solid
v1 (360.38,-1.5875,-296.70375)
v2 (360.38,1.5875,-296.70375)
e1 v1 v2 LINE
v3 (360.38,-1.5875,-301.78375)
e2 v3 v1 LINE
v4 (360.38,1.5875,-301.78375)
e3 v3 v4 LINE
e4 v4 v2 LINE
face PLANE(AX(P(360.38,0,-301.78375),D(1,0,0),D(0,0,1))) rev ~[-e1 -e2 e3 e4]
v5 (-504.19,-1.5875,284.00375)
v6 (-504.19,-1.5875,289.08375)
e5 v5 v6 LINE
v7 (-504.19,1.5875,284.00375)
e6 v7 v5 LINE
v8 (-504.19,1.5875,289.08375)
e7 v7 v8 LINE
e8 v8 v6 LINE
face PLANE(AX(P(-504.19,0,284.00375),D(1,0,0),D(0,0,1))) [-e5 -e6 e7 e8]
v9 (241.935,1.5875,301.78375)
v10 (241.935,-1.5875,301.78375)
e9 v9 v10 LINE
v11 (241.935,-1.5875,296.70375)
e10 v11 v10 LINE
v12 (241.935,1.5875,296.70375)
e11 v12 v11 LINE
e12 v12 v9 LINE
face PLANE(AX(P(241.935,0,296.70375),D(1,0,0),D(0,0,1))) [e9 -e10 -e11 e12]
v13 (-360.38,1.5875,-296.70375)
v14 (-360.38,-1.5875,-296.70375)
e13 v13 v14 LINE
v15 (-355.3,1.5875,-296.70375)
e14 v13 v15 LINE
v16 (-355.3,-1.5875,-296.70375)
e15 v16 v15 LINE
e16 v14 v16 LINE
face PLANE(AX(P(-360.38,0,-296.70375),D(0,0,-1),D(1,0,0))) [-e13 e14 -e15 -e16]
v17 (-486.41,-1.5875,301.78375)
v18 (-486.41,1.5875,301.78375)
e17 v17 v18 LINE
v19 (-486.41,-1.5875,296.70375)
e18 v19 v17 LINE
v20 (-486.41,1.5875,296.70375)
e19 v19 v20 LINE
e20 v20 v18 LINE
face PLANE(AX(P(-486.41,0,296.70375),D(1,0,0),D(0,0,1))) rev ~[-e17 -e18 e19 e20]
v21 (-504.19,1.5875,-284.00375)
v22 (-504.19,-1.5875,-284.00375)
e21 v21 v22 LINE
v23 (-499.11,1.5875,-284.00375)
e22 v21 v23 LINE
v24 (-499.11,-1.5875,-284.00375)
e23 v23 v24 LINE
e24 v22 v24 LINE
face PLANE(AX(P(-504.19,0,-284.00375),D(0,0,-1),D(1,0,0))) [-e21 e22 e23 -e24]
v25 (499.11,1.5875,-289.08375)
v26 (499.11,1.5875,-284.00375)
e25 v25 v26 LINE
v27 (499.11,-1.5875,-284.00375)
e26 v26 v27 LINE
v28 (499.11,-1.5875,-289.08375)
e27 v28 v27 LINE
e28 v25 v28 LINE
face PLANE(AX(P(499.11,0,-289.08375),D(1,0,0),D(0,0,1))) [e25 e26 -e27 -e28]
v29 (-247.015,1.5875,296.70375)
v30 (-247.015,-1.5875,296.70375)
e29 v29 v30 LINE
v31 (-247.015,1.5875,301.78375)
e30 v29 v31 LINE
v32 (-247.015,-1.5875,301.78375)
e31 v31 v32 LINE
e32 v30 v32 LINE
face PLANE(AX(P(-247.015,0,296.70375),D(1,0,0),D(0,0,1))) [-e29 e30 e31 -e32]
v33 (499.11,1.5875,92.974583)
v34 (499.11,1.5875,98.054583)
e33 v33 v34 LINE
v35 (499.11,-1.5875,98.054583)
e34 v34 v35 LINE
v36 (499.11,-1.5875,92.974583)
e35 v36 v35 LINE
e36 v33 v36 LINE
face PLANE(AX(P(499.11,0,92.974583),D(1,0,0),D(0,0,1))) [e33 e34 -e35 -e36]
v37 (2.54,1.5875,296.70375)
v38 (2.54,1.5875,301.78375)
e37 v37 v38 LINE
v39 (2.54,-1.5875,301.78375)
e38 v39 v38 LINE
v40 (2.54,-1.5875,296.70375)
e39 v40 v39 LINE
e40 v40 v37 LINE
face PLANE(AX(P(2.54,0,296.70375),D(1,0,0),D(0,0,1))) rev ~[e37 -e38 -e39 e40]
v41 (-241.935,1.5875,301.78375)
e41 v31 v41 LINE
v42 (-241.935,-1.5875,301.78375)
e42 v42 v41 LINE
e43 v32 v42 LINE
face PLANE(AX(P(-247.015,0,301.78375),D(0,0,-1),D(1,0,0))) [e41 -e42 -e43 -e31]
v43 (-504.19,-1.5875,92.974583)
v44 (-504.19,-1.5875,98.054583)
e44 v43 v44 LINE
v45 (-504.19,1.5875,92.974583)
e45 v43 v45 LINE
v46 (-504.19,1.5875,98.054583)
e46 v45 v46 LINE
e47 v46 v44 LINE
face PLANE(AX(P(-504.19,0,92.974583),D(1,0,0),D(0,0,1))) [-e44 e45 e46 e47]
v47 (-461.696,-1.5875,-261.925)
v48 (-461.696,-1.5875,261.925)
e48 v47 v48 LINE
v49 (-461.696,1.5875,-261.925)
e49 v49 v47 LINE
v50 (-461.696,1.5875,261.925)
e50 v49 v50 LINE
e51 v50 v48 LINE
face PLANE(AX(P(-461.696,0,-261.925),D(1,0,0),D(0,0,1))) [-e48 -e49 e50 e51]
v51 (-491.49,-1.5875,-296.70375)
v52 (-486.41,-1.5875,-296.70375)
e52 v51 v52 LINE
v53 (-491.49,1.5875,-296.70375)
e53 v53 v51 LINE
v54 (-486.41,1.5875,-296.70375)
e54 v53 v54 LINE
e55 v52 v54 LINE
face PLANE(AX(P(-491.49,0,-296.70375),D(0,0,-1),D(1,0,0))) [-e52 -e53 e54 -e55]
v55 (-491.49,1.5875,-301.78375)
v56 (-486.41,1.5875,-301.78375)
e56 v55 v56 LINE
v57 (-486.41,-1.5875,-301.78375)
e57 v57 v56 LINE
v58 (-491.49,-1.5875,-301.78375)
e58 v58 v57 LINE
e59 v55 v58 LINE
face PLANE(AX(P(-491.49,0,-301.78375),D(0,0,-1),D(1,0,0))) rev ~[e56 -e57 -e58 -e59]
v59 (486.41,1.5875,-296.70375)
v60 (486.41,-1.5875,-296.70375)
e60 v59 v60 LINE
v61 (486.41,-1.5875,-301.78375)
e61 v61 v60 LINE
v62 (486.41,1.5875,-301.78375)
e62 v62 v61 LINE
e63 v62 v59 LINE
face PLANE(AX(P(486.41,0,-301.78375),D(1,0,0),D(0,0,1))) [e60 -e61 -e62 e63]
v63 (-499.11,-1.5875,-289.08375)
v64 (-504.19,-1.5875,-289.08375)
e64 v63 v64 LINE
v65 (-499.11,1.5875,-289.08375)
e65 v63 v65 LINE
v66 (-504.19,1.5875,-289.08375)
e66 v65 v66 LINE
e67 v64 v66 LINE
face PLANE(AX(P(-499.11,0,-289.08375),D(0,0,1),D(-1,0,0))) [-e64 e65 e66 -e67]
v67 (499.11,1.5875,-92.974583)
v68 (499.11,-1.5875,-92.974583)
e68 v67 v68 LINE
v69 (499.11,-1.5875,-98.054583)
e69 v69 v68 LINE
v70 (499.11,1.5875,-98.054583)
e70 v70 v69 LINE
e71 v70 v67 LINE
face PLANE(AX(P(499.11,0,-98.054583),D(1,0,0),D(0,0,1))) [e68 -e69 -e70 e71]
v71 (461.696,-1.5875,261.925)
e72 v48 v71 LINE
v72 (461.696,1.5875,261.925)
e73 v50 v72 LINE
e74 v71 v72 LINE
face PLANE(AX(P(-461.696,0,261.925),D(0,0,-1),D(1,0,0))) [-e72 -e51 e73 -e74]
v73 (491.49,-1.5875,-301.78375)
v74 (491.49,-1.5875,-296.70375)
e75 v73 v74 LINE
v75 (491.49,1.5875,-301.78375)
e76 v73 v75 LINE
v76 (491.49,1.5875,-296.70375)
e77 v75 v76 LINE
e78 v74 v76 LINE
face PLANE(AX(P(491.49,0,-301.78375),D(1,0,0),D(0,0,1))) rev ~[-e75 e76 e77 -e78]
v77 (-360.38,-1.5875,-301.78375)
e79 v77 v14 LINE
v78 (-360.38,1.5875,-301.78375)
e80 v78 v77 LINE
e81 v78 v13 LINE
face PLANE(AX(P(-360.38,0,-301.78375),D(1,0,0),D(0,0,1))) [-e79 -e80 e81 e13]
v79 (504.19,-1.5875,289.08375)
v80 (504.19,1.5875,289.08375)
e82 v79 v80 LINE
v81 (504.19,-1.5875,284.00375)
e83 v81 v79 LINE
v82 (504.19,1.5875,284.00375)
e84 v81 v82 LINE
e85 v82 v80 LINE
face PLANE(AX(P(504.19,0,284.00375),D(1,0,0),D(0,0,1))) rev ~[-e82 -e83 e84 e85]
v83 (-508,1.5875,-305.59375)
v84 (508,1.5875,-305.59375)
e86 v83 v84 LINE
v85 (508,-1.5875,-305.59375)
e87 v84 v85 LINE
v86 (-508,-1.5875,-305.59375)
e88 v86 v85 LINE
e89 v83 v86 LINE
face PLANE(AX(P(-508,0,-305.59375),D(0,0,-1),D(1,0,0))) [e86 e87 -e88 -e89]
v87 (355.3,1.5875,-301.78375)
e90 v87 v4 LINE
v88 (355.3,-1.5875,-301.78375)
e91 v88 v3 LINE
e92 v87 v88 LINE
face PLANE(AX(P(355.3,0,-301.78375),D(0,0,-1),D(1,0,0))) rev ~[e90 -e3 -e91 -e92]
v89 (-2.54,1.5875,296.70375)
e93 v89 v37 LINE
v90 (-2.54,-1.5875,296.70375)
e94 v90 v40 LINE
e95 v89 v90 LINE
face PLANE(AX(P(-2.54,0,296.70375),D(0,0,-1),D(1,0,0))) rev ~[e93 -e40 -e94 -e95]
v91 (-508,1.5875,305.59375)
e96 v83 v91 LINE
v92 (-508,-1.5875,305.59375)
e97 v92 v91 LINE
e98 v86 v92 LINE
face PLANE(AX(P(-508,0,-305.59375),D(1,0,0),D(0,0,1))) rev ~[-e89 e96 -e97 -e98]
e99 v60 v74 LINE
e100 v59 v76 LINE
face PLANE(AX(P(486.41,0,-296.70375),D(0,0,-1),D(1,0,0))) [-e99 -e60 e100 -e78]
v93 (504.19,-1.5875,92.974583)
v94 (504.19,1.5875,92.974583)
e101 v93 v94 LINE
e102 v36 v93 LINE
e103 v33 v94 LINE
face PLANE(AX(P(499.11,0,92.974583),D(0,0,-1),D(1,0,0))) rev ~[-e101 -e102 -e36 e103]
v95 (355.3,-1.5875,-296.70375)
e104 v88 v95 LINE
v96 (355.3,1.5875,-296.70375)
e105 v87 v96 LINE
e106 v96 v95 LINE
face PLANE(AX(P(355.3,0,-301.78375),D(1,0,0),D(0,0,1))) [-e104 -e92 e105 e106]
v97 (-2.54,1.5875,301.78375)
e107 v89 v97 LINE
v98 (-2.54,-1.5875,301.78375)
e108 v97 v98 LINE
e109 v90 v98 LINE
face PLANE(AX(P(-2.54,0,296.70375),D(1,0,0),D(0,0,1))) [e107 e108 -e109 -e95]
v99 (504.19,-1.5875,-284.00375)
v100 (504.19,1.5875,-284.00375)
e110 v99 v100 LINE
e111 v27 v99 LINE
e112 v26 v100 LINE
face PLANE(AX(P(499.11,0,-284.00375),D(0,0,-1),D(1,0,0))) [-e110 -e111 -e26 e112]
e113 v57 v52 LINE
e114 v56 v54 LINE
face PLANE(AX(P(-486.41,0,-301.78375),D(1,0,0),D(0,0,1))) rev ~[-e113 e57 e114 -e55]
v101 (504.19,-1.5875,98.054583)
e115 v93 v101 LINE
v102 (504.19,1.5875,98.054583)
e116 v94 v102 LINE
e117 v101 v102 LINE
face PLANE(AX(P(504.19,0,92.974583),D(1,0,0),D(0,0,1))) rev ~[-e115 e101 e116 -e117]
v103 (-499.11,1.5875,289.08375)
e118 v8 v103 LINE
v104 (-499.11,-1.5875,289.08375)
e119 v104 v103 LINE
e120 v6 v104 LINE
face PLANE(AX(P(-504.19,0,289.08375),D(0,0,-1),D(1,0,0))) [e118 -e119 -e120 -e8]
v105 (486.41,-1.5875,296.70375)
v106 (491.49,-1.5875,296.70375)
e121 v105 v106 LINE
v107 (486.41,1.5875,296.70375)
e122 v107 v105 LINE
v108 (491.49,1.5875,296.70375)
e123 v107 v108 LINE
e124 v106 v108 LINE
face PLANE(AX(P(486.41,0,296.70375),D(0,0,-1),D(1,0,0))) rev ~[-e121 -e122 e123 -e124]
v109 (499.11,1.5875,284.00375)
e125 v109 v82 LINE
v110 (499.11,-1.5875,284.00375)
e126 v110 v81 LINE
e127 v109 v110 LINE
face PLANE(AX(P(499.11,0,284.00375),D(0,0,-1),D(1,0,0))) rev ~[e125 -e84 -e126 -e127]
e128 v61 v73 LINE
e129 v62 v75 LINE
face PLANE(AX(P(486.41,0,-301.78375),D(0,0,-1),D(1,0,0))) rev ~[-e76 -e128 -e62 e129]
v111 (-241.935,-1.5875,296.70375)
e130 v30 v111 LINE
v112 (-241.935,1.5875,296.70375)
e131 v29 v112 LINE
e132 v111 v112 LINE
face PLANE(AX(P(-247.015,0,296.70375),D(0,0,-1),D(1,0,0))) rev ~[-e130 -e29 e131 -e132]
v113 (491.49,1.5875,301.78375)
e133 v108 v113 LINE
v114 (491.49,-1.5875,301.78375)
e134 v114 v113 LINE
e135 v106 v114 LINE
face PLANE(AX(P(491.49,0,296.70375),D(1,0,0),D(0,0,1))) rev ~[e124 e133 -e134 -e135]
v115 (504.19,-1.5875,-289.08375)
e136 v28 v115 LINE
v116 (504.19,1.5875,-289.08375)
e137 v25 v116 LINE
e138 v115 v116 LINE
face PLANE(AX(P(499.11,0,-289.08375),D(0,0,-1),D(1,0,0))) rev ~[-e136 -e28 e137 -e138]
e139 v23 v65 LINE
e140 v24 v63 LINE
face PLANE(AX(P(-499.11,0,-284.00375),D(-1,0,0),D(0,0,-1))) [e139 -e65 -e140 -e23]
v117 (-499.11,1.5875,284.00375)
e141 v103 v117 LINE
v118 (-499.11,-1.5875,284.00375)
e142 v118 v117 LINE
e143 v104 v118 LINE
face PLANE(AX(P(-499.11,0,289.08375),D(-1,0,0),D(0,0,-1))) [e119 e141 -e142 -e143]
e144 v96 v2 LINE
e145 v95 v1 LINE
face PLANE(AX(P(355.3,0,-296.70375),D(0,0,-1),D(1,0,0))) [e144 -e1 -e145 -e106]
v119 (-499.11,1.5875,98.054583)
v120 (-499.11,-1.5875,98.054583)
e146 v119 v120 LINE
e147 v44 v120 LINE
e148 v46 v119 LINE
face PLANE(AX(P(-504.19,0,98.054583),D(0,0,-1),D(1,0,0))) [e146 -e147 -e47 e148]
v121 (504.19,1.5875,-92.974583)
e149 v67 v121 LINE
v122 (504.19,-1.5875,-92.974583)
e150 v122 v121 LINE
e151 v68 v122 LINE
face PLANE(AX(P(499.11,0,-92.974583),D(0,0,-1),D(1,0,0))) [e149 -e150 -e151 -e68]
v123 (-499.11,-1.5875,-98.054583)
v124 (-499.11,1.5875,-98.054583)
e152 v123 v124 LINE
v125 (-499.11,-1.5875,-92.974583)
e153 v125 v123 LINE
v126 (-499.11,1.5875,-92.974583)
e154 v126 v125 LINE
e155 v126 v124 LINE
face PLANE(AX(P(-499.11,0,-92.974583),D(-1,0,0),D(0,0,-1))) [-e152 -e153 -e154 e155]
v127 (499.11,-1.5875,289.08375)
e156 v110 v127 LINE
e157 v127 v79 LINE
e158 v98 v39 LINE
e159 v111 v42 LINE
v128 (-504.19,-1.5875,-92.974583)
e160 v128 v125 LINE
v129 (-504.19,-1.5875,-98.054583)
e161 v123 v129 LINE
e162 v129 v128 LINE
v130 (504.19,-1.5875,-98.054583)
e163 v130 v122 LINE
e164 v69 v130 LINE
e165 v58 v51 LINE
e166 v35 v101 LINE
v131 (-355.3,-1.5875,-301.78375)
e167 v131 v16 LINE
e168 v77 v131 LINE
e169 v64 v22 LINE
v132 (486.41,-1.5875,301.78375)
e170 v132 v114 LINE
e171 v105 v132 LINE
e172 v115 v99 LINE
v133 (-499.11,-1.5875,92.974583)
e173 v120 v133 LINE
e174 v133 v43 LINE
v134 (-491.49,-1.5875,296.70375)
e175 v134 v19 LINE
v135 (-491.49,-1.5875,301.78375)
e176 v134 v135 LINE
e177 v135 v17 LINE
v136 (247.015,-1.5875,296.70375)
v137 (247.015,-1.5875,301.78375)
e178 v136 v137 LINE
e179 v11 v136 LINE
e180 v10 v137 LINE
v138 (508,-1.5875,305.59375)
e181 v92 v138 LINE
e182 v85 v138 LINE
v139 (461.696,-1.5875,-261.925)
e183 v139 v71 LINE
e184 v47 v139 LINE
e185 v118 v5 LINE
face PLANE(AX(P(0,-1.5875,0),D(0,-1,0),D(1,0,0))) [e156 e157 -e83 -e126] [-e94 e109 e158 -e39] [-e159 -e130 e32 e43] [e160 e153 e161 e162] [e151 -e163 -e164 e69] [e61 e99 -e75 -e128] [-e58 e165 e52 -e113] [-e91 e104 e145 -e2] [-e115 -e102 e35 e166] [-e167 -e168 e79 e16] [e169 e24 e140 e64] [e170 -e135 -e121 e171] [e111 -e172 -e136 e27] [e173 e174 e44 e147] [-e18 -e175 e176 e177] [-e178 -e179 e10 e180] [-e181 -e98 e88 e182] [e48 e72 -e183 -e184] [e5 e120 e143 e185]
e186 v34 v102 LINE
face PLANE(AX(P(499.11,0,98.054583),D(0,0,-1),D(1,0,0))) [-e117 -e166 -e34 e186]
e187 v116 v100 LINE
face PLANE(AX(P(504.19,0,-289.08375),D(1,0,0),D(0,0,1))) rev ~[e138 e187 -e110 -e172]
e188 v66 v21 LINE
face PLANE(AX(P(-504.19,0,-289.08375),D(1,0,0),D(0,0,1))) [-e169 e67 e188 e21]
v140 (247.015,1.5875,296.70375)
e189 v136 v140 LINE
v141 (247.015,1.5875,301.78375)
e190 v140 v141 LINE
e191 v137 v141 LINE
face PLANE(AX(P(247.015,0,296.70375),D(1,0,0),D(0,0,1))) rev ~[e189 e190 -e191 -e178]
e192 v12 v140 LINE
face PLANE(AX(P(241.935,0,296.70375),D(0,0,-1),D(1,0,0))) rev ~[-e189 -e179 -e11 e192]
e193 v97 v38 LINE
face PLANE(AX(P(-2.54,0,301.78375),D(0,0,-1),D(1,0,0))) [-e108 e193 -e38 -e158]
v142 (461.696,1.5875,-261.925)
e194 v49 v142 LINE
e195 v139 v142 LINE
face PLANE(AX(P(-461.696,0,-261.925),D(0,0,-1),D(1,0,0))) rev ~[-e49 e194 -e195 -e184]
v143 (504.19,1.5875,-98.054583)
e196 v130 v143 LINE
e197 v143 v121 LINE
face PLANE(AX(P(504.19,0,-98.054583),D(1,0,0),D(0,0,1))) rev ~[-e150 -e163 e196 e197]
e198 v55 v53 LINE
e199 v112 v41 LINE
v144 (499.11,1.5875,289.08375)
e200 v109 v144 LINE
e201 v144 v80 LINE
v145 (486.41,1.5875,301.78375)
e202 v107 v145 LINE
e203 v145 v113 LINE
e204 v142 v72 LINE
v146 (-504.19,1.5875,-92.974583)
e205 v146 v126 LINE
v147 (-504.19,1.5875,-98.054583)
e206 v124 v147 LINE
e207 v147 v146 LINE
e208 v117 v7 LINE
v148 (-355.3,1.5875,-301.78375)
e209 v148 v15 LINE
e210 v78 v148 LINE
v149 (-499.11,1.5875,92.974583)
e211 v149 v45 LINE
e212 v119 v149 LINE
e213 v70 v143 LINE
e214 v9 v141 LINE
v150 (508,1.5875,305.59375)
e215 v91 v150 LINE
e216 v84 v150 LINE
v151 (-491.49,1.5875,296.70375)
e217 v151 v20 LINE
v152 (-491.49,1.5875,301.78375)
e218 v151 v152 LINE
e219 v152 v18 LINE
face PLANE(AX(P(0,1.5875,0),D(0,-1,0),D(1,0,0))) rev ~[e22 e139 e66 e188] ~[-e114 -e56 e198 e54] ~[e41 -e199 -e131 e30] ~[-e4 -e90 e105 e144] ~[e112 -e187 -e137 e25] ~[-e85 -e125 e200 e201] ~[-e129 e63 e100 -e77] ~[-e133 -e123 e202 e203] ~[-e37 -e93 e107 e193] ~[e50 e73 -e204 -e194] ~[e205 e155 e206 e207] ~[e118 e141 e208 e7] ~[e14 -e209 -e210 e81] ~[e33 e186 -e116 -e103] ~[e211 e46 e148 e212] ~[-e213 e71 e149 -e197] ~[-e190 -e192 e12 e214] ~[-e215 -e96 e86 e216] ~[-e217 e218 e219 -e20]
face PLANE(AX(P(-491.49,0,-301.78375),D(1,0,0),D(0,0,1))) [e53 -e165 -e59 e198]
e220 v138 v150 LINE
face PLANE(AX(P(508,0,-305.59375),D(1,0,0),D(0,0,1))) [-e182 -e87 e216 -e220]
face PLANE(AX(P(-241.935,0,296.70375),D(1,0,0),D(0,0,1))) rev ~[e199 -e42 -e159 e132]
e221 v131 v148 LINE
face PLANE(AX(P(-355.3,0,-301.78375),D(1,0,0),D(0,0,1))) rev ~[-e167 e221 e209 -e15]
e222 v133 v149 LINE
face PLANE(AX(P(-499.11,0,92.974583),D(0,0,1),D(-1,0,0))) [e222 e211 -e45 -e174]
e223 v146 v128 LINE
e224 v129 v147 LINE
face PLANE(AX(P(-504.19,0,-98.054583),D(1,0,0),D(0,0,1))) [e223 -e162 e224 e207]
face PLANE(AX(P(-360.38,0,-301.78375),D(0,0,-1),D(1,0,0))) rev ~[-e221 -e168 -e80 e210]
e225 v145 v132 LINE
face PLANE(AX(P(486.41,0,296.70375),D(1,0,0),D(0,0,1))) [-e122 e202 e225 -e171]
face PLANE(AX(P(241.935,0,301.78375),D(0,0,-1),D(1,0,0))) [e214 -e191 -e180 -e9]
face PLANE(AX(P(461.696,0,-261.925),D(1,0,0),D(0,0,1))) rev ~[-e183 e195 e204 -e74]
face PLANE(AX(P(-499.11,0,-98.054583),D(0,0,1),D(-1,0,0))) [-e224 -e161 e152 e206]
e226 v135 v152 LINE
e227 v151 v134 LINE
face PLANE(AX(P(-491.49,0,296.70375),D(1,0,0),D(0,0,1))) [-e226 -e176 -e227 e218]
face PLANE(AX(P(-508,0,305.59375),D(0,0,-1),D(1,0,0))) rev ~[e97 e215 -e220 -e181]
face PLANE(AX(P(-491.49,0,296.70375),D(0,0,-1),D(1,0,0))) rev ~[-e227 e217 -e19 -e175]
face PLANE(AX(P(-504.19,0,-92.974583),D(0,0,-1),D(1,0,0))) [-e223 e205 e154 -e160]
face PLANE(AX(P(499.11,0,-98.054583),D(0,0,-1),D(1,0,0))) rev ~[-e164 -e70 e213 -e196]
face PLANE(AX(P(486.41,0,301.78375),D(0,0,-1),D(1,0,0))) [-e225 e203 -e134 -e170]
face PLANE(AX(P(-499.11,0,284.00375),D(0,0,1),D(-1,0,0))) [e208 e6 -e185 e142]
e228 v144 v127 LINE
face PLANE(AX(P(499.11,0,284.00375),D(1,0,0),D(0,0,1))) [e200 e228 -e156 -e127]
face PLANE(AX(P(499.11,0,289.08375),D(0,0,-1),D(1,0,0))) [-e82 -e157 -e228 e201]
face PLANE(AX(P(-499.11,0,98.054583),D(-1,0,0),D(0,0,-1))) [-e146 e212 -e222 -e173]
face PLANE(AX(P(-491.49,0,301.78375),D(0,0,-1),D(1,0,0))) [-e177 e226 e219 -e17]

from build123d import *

# Parameters (mm, degrees)
F0_W     = 1016
F0_H     = 611.1875
F0_W_2   = 5.08
F0_H_2   = 5.08
F0_W_3   = 990.6
F0_H_3   = 585.7875
F0_R     = 5.969
F0_W_4   = 951.992
F0_H_4   = 552.45
F0_W_5   = 923.392
F0_H_5   = 523.85
F1_DEPTH = 1.5875


# Not quite as in the source:
# - a feature names something its author has since deleted; it is built from what else it names


with BuildPart() as f1:
    # F0 (on Front) → F1 (new body, symmetric)
    with BuildSketch(Plane.XZ):
        Rectangle(F0_W, F0_H)
        with Locations((-488.95, -299.24375)):
            Rectangle(F0_W_2, F0_H_2, mode=Mode.SUBTRACT)
        Polygon((-504.19, -284.00375), (-501.65, -284.00375), (-499.11, -284.00375), (-499.11, -289.08375), (-504.19, -289.08375), align=None, mode=Mode.SUBTRACT)
        with Locations((-357.84, -299.24375)):
            Rectangle(F0_W_2, F0_H_2, mode=Mode.SUBTRACT)
        Polygon((-504.19, -92.9745833333), (-501.65, -92.9745833333), (-499.11, -92.9745833333), (-499.11, -98.0545833333), (-501.65, -98.0545833333), (-504.19, -98.0545833333), align=None, mode=Mode.SUBTRACT)
        with Locations((357.84, -299.24375)):
            Rectangle(F0_W_2, F0_H_2, mode=Mode.SUBTRACT)
        with Locations((488.95, -299.24375)):
            Rectangle(F0_W_2, F0_H_2, mode=Mode.SUBTRACT)
        with Locations((501.65, -286.54375)):
            Rectangle(F0_W_2, F0_H_2, mode=Mode.SUBTRACT)
        Rectangle(F0_W_3, F0_H_3, mode=Mode.SUBTRACT)
        with Locations((501.65, -95.5145833333)):
            Rectangle(F0_W_2, F0_H_2, mode=Mode.SUBTRACT)
        Polygon((-504.19, 98.0545833333), (-501.65, 98.0545833333), (-499.11, 98.0545833333), (-499.11, 92.9745833333), (-501.65, 92.9745833333), (-504.19, 92.9745833333), align=None, mode=Mode.SUBTRACT)
        Polygon((-501.65, 284.00375), (-504.19, 284.00375), (-504.19, 289.08375), (-499.11, 289.08375), (-499.11, 284.00375), align=None, mode=Mode.SUBTRACT)
        with Locations((-488.95, 299.24375)):
            Circle(F0_R, mode=Mode.SUBTRACT)
        with Locations((-244.475, 299.24375)):
            Rectangle(F0_W_2, F0_H_2, mode=Mode.SUBTRACT)
        with Locations((501.65, 95.5145833333)):
            Rectangle(F0_W_2, F0_H_2, mode=Mode.SUBTRACT)
        with Locations((0, 299.24375)):
            Rectangle(F0_W_2, F0_H_2, mode=Mode.SUBTRACT)
        with Locations((244.475, 299.24375)):
            Rectangle(F0_W_2, F0_H_2, mode=Mode.SUBTRACT)
        with Locations((501.65, 286.54375)):
            Rectangle(F0_W_2, F0_H_2, mode=Mode.SUBTRACT)
        with Locations((488.95, 299.24375)):
            Rectangle(F0_W_2, F0_H_2, mode=Mode.SUBTRACT)
        Rectangle(F0_W_3, F0_H_3)
        Rectangle(F0_W_4, F0_H_4, mode=Mode.SUBTRACT)
        Rectangle(F0_W_4, F0_H_4)
        Rectangle(F0_W_5, F0_H_5, mode=Mode.SUBTRACT)
        with Locations((-488.95, 299.24375)):
            Circle(F0_R)
        with Locations((-488.95, 299.24375)):
            Rectangle(F0_W_2, F0_H_2, mode=Mode.SUBTRACT)
    extrude(amount=F1_DEPTH, both=True)


solid = f1.part
